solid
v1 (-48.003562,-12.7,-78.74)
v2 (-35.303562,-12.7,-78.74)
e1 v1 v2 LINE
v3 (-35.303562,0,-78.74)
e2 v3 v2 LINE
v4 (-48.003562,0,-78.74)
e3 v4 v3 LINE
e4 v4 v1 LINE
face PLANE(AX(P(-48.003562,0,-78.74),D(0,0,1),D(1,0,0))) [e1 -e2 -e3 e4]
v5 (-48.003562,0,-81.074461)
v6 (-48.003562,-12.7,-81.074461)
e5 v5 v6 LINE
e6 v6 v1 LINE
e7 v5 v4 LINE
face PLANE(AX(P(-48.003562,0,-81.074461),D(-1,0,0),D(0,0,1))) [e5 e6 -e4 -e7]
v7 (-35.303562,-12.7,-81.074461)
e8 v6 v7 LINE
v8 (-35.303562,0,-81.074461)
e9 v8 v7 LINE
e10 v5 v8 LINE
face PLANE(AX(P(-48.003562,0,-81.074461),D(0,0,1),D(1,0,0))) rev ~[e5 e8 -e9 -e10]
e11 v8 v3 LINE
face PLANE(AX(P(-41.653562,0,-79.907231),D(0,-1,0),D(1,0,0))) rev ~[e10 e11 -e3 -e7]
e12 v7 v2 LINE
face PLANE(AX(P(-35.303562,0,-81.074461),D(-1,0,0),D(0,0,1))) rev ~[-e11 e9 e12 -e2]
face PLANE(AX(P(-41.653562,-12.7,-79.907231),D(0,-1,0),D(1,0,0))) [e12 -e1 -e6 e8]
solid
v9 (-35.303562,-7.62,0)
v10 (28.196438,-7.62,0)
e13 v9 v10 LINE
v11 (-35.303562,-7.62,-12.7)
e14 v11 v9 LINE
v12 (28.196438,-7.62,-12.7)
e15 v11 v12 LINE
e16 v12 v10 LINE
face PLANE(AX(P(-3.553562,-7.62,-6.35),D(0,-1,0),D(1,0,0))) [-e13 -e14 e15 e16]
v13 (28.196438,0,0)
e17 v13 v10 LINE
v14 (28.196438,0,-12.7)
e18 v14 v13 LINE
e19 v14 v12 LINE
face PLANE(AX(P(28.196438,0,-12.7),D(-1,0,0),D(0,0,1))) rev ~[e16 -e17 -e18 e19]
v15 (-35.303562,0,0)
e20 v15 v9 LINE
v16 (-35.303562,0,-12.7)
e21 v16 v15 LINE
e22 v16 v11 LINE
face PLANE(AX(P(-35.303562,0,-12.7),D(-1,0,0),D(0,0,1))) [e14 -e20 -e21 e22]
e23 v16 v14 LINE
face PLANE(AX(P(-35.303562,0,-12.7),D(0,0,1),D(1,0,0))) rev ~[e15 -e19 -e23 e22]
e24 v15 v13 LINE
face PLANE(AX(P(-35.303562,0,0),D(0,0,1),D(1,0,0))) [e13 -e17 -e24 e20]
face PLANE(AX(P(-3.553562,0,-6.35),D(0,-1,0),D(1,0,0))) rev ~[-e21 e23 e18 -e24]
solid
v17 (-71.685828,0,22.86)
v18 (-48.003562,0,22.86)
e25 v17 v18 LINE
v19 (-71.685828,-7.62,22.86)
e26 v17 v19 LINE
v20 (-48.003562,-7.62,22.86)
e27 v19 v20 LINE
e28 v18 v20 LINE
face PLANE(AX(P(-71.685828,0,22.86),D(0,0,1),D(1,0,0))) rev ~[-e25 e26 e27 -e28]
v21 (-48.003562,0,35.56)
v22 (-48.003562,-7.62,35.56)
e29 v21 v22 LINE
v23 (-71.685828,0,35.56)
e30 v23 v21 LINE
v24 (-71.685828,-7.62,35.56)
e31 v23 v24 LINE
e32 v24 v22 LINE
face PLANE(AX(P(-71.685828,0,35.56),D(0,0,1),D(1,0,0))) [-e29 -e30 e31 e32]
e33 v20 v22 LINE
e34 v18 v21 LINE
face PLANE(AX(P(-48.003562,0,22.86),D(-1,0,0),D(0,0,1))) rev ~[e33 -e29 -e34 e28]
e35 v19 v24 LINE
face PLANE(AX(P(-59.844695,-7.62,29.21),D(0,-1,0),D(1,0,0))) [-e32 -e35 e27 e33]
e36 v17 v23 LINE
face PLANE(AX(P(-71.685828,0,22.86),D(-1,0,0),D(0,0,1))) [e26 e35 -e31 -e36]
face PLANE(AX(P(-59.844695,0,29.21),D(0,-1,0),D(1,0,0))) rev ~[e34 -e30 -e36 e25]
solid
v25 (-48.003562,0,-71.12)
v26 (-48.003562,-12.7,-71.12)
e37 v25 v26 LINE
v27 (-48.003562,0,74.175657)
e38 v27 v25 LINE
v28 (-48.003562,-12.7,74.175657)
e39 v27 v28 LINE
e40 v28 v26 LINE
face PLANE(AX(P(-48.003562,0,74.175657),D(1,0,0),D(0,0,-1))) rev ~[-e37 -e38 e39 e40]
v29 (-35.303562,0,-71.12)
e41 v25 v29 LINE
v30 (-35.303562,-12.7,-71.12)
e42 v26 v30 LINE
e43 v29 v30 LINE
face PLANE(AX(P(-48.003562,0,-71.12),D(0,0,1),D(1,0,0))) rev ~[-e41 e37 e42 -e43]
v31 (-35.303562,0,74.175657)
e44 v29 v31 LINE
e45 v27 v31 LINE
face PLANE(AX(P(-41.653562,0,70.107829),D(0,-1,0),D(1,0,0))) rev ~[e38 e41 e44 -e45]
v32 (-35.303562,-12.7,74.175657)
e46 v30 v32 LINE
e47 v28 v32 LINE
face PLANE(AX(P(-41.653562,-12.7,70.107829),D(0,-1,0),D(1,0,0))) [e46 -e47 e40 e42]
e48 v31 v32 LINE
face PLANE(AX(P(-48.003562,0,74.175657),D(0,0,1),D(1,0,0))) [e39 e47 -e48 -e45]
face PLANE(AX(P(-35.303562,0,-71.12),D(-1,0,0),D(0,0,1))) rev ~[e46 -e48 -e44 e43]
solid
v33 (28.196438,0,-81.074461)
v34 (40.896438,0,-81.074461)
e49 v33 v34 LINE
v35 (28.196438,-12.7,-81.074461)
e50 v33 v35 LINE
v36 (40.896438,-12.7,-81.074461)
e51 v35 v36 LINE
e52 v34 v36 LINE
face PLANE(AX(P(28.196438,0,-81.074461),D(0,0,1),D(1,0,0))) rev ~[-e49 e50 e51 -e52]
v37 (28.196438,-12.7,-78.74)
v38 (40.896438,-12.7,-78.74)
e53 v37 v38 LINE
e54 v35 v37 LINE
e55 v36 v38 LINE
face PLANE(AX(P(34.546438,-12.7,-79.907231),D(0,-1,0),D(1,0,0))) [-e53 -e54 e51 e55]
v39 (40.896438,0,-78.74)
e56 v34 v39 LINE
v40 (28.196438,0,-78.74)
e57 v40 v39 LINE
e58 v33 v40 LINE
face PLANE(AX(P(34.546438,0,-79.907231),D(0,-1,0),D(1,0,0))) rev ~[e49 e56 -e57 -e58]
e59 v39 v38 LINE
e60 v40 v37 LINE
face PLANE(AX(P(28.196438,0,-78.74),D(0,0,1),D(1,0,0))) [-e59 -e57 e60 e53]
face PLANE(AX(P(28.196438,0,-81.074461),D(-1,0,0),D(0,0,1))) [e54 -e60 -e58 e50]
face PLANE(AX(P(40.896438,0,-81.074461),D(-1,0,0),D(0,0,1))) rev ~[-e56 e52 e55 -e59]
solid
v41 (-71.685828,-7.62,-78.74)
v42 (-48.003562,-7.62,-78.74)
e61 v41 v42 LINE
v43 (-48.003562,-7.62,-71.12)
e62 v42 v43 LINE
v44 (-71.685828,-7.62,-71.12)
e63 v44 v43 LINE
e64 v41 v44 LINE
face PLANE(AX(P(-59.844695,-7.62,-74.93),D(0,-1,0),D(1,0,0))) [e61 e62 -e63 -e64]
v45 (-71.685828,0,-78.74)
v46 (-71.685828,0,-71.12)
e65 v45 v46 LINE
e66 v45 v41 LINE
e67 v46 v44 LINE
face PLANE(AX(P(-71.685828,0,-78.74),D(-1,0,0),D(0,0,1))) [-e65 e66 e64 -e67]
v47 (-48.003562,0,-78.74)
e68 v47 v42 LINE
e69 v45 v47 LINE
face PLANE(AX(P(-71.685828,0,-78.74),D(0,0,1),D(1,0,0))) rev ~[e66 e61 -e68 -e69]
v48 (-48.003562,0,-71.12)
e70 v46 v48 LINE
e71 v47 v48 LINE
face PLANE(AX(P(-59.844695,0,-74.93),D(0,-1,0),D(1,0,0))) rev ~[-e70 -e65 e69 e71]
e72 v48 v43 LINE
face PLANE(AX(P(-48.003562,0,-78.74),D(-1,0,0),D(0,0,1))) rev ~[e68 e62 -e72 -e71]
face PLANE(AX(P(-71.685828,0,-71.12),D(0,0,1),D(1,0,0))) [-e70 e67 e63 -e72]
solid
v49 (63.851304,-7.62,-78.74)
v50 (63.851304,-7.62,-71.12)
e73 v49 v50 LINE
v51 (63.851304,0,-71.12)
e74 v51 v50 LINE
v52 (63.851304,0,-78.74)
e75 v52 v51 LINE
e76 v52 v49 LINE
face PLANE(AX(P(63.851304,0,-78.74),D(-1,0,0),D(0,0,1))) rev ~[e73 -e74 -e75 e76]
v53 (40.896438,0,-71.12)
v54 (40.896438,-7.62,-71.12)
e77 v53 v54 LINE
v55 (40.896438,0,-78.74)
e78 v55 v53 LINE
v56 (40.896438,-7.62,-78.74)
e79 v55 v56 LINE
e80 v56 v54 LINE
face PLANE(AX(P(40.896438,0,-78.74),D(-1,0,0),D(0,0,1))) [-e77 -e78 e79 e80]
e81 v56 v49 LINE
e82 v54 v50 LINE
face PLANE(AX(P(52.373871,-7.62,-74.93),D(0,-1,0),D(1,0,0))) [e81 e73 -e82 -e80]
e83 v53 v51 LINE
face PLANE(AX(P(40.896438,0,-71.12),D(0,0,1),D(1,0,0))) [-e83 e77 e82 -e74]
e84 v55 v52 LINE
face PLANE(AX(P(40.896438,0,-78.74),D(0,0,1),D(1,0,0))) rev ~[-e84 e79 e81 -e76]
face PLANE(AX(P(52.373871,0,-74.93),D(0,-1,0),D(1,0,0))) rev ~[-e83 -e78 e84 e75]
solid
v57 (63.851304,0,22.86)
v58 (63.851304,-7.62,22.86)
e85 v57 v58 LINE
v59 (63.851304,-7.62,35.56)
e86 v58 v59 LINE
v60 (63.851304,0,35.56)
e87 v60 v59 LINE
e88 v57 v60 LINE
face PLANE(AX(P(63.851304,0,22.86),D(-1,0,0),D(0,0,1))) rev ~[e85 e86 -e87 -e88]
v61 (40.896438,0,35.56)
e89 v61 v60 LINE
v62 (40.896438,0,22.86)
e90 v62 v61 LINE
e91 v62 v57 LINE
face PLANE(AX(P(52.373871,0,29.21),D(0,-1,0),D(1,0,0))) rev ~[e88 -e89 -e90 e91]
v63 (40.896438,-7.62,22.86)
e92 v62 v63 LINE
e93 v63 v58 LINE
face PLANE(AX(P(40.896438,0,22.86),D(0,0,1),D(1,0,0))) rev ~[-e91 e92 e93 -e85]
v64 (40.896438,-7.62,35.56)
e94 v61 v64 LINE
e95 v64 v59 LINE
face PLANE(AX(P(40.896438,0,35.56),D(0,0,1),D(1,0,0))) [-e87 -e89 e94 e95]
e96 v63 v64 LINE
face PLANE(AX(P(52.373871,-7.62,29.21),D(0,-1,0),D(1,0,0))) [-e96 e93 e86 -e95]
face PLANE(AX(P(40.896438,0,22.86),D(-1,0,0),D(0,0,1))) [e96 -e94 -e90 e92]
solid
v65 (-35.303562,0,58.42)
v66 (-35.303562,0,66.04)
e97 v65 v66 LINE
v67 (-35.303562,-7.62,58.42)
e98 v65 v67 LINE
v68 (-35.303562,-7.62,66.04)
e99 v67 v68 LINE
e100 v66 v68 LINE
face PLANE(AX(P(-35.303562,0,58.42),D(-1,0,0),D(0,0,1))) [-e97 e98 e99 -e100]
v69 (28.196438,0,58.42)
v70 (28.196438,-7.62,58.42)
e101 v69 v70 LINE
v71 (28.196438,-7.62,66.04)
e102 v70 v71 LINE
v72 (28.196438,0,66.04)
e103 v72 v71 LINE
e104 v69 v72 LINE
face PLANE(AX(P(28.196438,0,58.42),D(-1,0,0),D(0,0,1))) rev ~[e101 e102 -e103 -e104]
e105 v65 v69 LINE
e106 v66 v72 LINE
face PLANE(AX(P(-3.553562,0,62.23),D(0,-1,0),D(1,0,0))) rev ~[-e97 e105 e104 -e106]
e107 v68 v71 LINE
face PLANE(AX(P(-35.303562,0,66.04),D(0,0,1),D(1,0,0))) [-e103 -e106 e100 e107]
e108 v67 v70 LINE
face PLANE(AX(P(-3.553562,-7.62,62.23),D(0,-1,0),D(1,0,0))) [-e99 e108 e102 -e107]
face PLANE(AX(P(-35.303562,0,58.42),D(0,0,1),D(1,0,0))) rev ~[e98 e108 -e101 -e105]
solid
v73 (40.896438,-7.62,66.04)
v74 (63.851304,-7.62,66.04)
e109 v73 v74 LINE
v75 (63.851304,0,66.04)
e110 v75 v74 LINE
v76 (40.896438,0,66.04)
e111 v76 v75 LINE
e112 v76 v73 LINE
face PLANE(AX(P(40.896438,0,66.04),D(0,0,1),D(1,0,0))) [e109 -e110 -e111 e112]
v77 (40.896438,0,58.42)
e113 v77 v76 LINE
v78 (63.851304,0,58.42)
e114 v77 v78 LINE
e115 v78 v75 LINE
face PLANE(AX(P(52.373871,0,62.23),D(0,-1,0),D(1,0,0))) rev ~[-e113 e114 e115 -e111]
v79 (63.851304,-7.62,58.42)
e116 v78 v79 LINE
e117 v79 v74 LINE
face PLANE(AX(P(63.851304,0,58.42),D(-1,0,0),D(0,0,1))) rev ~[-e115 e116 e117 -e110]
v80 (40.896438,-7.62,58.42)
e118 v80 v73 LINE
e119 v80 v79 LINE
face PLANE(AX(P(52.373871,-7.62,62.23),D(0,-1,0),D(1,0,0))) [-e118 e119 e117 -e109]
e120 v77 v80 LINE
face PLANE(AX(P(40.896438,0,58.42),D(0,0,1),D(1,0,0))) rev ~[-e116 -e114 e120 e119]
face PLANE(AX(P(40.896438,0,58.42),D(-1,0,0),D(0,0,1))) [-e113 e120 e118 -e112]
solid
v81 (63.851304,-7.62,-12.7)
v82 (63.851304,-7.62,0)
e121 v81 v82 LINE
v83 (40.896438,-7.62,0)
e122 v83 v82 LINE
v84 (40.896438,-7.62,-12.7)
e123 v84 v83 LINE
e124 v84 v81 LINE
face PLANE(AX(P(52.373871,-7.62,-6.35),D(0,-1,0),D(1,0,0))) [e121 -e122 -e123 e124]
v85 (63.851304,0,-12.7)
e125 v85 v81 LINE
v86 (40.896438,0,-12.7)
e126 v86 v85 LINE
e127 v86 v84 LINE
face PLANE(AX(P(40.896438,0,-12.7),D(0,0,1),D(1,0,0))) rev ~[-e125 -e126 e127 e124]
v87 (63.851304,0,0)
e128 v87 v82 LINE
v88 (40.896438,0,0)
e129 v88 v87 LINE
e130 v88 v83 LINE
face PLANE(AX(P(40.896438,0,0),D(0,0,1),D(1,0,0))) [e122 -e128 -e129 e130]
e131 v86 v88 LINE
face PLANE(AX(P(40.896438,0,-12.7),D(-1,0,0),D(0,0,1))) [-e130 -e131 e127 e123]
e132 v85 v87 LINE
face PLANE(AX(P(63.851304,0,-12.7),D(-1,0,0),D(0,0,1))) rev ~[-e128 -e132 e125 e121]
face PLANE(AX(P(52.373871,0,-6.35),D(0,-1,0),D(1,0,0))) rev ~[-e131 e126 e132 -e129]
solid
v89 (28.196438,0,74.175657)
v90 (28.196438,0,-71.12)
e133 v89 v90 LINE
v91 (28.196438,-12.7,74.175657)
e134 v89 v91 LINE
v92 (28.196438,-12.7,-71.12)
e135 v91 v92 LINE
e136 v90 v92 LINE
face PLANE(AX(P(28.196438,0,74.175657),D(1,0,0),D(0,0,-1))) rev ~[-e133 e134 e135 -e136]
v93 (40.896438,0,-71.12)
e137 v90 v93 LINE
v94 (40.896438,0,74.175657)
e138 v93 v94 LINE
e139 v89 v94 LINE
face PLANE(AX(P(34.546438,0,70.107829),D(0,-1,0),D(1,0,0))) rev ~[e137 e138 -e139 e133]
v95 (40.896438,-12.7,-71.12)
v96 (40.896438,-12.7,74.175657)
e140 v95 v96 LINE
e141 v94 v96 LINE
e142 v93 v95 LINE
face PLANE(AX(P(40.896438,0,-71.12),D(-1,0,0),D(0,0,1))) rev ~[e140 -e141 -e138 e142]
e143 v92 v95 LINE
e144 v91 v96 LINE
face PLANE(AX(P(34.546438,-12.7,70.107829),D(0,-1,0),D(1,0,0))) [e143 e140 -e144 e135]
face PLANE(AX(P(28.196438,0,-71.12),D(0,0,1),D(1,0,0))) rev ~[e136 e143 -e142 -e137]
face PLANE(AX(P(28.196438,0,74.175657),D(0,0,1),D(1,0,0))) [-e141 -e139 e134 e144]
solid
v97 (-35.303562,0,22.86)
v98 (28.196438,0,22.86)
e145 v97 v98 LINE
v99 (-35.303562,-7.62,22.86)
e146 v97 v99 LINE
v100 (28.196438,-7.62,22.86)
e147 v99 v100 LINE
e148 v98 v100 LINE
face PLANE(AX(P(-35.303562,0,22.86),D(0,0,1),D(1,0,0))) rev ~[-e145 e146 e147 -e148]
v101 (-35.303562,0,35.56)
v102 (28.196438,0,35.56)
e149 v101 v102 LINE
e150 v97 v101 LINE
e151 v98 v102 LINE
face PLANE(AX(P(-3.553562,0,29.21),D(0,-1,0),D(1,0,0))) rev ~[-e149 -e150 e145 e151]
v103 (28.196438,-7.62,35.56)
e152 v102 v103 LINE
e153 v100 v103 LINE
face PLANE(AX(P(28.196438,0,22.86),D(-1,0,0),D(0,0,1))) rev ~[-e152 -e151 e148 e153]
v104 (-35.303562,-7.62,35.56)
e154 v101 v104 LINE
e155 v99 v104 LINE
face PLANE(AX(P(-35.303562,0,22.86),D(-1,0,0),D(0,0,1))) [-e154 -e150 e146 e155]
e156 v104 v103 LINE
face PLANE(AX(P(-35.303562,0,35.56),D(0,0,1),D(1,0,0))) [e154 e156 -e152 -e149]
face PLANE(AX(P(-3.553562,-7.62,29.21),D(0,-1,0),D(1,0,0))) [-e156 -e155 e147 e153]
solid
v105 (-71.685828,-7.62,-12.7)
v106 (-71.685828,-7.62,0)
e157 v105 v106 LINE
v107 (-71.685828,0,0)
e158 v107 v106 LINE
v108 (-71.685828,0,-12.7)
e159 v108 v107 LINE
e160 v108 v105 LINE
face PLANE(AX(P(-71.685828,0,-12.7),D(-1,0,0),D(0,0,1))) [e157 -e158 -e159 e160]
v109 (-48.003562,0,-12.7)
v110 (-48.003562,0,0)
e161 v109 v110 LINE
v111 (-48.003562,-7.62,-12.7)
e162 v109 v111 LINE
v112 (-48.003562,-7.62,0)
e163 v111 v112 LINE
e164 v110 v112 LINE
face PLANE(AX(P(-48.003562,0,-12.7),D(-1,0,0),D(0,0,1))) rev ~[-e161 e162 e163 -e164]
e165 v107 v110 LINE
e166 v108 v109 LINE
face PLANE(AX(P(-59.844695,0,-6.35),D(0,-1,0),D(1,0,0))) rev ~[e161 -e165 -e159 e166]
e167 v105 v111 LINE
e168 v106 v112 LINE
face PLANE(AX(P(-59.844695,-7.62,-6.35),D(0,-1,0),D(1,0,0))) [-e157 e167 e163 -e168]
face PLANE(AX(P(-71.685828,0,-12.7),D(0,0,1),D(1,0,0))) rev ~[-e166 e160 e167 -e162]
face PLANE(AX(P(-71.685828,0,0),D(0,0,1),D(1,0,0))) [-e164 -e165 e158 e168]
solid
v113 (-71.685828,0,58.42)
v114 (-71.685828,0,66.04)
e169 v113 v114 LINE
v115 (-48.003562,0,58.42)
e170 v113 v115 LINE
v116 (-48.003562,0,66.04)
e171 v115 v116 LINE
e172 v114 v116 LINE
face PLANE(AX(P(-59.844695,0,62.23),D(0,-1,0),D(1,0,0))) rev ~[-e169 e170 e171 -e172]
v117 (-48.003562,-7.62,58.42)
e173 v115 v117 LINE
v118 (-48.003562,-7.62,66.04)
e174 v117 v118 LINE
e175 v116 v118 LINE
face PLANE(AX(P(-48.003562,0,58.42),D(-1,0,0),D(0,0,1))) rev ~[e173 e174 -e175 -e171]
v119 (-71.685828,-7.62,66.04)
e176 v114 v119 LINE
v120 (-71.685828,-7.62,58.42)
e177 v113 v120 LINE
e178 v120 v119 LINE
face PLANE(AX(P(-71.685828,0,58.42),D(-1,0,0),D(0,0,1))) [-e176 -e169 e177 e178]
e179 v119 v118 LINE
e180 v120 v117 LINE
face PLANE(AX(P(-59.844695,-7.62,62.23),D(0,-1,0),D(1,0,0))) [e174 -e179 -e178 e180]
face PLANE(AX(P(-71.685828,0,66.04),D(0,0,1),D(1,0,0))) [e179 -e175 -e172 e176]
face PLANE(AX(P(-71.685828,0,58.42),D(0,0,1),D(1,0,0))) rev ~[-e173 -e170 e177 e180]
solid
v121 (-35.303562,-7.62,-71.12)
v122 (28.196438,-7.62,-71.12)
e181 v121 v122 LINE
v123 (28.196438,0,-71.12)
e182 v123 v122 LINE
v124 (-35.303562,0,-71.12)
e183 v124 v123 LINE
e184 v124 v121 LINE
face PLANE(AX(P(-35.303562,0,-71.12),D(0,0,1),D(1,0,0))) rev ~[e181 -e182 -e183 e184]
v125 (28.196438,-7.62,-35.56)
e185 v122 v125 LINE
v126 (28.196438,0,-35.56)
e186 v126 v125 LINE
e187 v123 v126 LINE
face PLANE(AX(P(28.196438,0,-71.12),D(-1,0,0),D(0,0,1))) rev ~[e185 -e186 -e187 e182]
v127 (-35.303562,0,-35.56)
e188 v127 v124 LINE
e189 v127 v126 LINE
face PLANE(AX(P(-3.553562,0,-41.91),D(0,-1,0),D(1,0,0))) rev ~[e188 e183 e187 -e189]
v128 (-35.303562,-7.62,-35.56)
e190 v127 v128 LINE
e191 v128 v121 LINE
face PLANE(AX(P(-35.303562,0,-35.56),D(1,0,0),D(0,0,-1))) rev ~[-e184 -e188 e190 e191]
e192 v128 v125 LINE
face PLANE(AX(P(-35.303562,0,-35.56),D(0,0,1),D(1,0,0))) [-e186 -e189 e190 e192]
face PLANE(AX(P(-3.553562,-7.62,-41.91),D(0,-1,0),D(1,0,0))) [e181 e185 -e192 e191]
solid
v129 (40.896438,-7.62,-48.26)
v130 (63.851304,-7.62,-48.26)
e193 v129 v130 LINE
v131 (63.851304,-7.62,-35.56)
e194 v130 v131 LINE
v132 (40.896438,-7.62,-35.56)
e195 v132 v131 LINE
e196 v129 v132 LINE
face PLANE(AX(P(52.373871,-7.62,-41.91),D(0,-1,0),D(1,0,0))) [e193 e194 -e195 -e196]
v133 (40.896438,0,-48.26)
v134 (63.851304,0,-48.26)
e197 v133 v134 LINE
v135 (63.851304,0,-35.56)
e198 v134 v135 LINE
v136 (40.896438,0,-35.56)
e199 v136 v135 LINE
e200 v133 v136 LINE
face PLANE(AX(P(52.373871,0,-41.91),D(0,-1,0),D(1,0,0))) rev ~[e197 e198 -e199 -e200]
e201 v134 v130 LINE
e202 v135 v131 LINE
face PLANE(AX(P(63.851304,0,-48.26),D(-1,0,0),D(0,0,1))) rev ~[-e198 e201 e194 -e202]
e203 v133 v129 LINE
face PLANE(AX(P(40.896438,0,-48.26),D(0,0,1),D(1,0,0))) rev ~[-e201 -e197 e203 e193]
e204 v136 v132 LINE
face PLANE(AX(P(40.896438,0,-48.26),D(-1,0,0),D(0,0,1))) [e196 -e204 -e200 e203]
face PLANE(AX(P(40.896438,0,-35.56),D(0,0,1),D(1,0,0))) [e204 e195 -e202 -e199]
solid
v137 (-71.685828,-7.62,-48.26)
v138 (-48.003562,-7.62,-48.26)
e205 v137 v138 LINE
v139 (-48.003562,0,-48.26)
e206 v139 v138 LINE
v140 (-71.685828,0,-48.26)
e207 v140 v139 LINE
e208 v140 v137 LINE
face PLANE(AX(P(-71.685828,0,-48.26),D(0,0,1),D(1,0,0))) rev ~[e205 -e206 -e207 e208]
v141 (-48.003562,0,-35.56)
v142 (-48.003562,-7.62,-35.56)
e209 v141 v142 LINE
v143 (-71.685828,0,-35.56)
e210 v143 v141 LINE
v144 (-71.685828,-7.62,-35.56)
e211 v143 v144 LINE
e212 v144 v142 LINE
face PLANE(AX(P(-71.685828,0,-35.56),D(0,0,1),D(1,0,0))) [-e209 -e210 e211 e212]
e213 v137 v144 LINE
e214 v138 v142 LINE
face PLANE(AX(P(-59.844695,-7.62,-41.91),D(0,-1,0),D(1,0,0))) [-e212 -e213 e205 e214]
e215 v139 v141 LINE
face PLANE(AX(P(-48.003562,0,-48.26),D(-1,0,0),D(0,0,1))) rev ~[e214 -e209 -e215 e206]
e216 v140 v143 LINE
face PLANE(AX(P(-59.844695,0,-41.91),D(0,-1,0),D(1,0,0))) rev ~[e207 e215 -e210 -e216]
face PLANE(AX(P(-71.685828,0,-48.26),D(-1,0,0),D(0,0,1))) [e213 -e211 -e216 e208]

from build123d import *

# Parameters (mm, degrees)
F0_W     = 12.7
F0_H     = 8.135657315
F0_H_2   = 22.86
F0_H_3   = 7.62
F0_H_4   = 12.7
F1_DEPTH = 12.7
F0_H_5   = 2.3344613409
F0_W_2   = 23.6822664738
F2_DEPTH = 7.62
F0_W_3   = 63.5
F0_W_4   = 22.954866147


# Not quite as in the source:
# - a feature names something its author has since deleted; it is built from what else it names


with BuildPart() as f1:
    # F0 (on Front) → F1 (new body)
    with BuildSketch(Plane.XZ):
        with Locations((-41.6535617948, 70.1078286575)):
            Rectangle(F0_W, F0_H)
        with Locations((-41.6535617948, 46.99)):
            Rectangle(F0_W, F0_H_2)
        with Locations((-41.6535617948, 11.43)):
            Rectangle(F0_W, F0_H_2)
        with Locations((-41.6535617948, -24.13)):
            Rectangle(F0_W, F0_H_2)
        with Locations((-41.6535617948, 62.23)):
            Rectangle(F0_W, F0_H_3)
        Polygon((-35.3035617948, -71.12), (-35.3035617948, -67.4191057513), (-35.3035617948, -48.26), (-48.0035617948, -48.26), (-48.0035617948, -67.4191057513), (-48.0035617948, -71.12), align=None)
        with Locations((-41.6535617948, -41.91)):
            Rectangle(F0_W, F0_H_4)
        with Locations((-41.6535617948, -6.35)):
            Rectangle(F0_W, F0_H_4)
        with Locations((-41.6535617948, 29.21)):
            Rectangle(F0_W, F0_H_4)
    extrude(amount=F1_DEPTH)


with BuildPart() as f1b:
    # F0 (on Front) → F1, piece 2 (new body)
    with BuildSketch(Plane.XZ):
        with Locations((34.5464382052, 70.1078286575)):
            Rectangle(F0_W, F0_H)
        with Locations((34.5464382052, 46.99)):
            Rectangle(F0_W, F0_H_2)
        with Locations((34.5464382052, 11.43)):
            Rectangle(F0_W, F0_H_2)
        with Locations((34.5464382052, -24.13)):
            Rectangle(F0_W, F0_H_2)
        with Locations((34.5464382052, 62.23)):
            Rectangle(F0_W, F0_H_3)
        with Locations((34.5464382052, 29.21)):
            Rectangle(F0_W, F0_H_4)
        with Locations((34.5464382052, -6.35)):
            Rectangle(F0_W, F0_H_4)
        with Locations((34.5464382052, -41.91)):
            Rectangle(F0_W, F0_H_4)
        Polygon((40.8964382052, -48.26), (28.1964382052, -48.26), (28.1964382052, -67.4191057513), (28.1964382052, -71.12), (40.8964382052, -71.12), (40.8964382052, -67.4191057513), align=None)
    extrude(amount=F1_DEPTH)


with BuildPart() as f1c:
    # F0 (on Front) → F1, piece 3 (new body)
    with BuildSketch(Plane.XZ):
        with Locations((34.5464382052, -79.9072306705)):
            Rectangle(F0_W, F0_H_5)
    extrude(amount=F1_DEPTH)


with BuildPart() as f1d:
    # F0 (on Front) → F1, piece 4 (new body)
    with BuildSketch(Plane.XZ):
        with Locations((-41.6535617948, -79.9072306705)):
            Rectangle(F0_W, F0_H_5)
    extrude(amount=F1_DEPTH)


with BuildPart() as f2:
    # F0 (on Front) → F2 (new body)
    with BuildSketch(Plane.XZ):
        with Locations((-59.8446950316, 62.23)):
            Rectangle(F0_W_2, F0_H_3)
    extrude(amount=F2_DEPTH)


with BuildPart() as f2b:
    # F0 (on Front) → F2, piece 2 (new body)
    with BuildSketch(Plane.XZ):
        with Locations((-3.5535617948, 62.23)):
            Rectangle(F0_W_3, F0_H_3)
    extrude(amount=F2_DEPTH)


with BuildPart() as f2c:
    # F0 (on Front) → F2, piece 3 (new body)
    with BuildSketch(Plane.XZ):
        with Locations((-59.8446950316, 29.21)):
            Rectangle(F0_W_2, F0_H_4)
    extrude(amount=F2_DEPTH)


with BuildPart() as f2d:
    # F0 (on Front) → F2, piece 4 (new body)
    with BuildSketch(Plane.XZ):
        with Locations((-3.5535617948, 29.21)):
            Rectangle(F0_W_3, F0_H_4)
    extrude(amount=F2_DEPTH)


with BuildPart() as f2e:
    # F0 (on Front) → F2, piece 5 (new body)
    with BuildSketch(Plane.XZ):
        with Locations((-59.8446950316, -6.35)):
            Rectangle(F0_W_2, F0_H_4)
    extrude(amount=F2_DEPTH)


with BuildPart() as f2f:
    # F0 (on Front) → F2, piece 6 (new body)
    with BuildSketch(Plane.XZ):
        with Locations((-3.5535617948, -6.35)):
            Rectangle(F0_W_3, F0_H_4)
    extrude(amount=F2_DEPTH)


with BuildPart() as f2g:
    # F0 (on Front) → F2, piece 7 (new body)
    with BuildSketch(Plane.XZ):
        with Locations((-59.8446950316, -41.91)):
            Rectangle(F0_W_2, F0_H_4)
    extrude(amount=F2_DEPTH)


with BuildPart() as f2h:
    # F0 (on Front) → F2, piece 8 (new body)
    with BuildSketch(Plane.XZ):
        with Locations((-3.5535617948, -41.91)):
            Rectangle(F0_W_3, F0_H_4)
        Polygon((-35.3035617948, -48.26), (-35.3035617948, -67.4191057513), (-35.3035617948, -71.12), (28.1964382052, -71.12), (28.1964382052, -67.4191057513), (28.1964382052, -48.26), align=None)
    extrude(amount=F2_DEPTH)


with BuildPart() as f2i:
    # F0 (on Front) → F2, piece 9 (new body)
    with BuildSketch(Plane.XZ):
        with Locations((-59.8446950316, -74.93)):
            Rectangle(F0_W_2, F0_H_3)
    extrude(amount=F2_DEPTH)


with BuildPart() as f2j:
    # F0 (on Front) → F2, piece 10 (new body)
    with BuildSketch(Plane.XZ):
        with Locations((52.3738712788, -74.93)):
            Rectangle(F0_W_4, F0_H_3)
    extrude(amount=F2_DEPTH)


with BuildPart() as f2k:
    # F0 (on Front) → F2, piece 11 (new body)
    with BuildSketch(Plane.XZ):
        with Locations((52.3738712788, -41.91)):
            Rectangle(F0_W_4, F0_H_4)
    extrude(amount=F2_DEPTH)


with BuildPart() as f2l:
    # F0 (on Front) → F2, piece 12 (new body)
    with BuildSketch(Plane.XZ):
        with Locations((52.3738712788, -6.35)):
            Rectangle(F0_W_4, F0_H_4)
    extrude(amount=F2_DEPTH)


with BuildPart() as f2m:
    # F0 (on Front) → F2, piece 13 (new body)
    with BuildSketch(Plane.XZ):
        with Locations((52.3738712788, 29.21)):
            Rectangle(F0_W_4, F0_H_4)
    extrude(amount=F2_DEPTH)


with BuildPart() as f2n:
    # F0 (on Front) → F2, piece 14 (new body)
    with BuildSketch(Plane.XZ):
        with Locations((52.3738712788, 62.23)):
            Rectangle(F0_W_4, F0_H_3)
    extrude(amount=F2_DEPTH)


solid = Compound([f1.part, f1b.part, f1c.part, f1d.part, f2.part, f2b.part, f2c.part, f2d.part, f2e.part, f2f.part, f2g.part, f2h.part, f2i.part, f2j.part, f2k.part, f2l.part, f2m.part, f2n.part])
